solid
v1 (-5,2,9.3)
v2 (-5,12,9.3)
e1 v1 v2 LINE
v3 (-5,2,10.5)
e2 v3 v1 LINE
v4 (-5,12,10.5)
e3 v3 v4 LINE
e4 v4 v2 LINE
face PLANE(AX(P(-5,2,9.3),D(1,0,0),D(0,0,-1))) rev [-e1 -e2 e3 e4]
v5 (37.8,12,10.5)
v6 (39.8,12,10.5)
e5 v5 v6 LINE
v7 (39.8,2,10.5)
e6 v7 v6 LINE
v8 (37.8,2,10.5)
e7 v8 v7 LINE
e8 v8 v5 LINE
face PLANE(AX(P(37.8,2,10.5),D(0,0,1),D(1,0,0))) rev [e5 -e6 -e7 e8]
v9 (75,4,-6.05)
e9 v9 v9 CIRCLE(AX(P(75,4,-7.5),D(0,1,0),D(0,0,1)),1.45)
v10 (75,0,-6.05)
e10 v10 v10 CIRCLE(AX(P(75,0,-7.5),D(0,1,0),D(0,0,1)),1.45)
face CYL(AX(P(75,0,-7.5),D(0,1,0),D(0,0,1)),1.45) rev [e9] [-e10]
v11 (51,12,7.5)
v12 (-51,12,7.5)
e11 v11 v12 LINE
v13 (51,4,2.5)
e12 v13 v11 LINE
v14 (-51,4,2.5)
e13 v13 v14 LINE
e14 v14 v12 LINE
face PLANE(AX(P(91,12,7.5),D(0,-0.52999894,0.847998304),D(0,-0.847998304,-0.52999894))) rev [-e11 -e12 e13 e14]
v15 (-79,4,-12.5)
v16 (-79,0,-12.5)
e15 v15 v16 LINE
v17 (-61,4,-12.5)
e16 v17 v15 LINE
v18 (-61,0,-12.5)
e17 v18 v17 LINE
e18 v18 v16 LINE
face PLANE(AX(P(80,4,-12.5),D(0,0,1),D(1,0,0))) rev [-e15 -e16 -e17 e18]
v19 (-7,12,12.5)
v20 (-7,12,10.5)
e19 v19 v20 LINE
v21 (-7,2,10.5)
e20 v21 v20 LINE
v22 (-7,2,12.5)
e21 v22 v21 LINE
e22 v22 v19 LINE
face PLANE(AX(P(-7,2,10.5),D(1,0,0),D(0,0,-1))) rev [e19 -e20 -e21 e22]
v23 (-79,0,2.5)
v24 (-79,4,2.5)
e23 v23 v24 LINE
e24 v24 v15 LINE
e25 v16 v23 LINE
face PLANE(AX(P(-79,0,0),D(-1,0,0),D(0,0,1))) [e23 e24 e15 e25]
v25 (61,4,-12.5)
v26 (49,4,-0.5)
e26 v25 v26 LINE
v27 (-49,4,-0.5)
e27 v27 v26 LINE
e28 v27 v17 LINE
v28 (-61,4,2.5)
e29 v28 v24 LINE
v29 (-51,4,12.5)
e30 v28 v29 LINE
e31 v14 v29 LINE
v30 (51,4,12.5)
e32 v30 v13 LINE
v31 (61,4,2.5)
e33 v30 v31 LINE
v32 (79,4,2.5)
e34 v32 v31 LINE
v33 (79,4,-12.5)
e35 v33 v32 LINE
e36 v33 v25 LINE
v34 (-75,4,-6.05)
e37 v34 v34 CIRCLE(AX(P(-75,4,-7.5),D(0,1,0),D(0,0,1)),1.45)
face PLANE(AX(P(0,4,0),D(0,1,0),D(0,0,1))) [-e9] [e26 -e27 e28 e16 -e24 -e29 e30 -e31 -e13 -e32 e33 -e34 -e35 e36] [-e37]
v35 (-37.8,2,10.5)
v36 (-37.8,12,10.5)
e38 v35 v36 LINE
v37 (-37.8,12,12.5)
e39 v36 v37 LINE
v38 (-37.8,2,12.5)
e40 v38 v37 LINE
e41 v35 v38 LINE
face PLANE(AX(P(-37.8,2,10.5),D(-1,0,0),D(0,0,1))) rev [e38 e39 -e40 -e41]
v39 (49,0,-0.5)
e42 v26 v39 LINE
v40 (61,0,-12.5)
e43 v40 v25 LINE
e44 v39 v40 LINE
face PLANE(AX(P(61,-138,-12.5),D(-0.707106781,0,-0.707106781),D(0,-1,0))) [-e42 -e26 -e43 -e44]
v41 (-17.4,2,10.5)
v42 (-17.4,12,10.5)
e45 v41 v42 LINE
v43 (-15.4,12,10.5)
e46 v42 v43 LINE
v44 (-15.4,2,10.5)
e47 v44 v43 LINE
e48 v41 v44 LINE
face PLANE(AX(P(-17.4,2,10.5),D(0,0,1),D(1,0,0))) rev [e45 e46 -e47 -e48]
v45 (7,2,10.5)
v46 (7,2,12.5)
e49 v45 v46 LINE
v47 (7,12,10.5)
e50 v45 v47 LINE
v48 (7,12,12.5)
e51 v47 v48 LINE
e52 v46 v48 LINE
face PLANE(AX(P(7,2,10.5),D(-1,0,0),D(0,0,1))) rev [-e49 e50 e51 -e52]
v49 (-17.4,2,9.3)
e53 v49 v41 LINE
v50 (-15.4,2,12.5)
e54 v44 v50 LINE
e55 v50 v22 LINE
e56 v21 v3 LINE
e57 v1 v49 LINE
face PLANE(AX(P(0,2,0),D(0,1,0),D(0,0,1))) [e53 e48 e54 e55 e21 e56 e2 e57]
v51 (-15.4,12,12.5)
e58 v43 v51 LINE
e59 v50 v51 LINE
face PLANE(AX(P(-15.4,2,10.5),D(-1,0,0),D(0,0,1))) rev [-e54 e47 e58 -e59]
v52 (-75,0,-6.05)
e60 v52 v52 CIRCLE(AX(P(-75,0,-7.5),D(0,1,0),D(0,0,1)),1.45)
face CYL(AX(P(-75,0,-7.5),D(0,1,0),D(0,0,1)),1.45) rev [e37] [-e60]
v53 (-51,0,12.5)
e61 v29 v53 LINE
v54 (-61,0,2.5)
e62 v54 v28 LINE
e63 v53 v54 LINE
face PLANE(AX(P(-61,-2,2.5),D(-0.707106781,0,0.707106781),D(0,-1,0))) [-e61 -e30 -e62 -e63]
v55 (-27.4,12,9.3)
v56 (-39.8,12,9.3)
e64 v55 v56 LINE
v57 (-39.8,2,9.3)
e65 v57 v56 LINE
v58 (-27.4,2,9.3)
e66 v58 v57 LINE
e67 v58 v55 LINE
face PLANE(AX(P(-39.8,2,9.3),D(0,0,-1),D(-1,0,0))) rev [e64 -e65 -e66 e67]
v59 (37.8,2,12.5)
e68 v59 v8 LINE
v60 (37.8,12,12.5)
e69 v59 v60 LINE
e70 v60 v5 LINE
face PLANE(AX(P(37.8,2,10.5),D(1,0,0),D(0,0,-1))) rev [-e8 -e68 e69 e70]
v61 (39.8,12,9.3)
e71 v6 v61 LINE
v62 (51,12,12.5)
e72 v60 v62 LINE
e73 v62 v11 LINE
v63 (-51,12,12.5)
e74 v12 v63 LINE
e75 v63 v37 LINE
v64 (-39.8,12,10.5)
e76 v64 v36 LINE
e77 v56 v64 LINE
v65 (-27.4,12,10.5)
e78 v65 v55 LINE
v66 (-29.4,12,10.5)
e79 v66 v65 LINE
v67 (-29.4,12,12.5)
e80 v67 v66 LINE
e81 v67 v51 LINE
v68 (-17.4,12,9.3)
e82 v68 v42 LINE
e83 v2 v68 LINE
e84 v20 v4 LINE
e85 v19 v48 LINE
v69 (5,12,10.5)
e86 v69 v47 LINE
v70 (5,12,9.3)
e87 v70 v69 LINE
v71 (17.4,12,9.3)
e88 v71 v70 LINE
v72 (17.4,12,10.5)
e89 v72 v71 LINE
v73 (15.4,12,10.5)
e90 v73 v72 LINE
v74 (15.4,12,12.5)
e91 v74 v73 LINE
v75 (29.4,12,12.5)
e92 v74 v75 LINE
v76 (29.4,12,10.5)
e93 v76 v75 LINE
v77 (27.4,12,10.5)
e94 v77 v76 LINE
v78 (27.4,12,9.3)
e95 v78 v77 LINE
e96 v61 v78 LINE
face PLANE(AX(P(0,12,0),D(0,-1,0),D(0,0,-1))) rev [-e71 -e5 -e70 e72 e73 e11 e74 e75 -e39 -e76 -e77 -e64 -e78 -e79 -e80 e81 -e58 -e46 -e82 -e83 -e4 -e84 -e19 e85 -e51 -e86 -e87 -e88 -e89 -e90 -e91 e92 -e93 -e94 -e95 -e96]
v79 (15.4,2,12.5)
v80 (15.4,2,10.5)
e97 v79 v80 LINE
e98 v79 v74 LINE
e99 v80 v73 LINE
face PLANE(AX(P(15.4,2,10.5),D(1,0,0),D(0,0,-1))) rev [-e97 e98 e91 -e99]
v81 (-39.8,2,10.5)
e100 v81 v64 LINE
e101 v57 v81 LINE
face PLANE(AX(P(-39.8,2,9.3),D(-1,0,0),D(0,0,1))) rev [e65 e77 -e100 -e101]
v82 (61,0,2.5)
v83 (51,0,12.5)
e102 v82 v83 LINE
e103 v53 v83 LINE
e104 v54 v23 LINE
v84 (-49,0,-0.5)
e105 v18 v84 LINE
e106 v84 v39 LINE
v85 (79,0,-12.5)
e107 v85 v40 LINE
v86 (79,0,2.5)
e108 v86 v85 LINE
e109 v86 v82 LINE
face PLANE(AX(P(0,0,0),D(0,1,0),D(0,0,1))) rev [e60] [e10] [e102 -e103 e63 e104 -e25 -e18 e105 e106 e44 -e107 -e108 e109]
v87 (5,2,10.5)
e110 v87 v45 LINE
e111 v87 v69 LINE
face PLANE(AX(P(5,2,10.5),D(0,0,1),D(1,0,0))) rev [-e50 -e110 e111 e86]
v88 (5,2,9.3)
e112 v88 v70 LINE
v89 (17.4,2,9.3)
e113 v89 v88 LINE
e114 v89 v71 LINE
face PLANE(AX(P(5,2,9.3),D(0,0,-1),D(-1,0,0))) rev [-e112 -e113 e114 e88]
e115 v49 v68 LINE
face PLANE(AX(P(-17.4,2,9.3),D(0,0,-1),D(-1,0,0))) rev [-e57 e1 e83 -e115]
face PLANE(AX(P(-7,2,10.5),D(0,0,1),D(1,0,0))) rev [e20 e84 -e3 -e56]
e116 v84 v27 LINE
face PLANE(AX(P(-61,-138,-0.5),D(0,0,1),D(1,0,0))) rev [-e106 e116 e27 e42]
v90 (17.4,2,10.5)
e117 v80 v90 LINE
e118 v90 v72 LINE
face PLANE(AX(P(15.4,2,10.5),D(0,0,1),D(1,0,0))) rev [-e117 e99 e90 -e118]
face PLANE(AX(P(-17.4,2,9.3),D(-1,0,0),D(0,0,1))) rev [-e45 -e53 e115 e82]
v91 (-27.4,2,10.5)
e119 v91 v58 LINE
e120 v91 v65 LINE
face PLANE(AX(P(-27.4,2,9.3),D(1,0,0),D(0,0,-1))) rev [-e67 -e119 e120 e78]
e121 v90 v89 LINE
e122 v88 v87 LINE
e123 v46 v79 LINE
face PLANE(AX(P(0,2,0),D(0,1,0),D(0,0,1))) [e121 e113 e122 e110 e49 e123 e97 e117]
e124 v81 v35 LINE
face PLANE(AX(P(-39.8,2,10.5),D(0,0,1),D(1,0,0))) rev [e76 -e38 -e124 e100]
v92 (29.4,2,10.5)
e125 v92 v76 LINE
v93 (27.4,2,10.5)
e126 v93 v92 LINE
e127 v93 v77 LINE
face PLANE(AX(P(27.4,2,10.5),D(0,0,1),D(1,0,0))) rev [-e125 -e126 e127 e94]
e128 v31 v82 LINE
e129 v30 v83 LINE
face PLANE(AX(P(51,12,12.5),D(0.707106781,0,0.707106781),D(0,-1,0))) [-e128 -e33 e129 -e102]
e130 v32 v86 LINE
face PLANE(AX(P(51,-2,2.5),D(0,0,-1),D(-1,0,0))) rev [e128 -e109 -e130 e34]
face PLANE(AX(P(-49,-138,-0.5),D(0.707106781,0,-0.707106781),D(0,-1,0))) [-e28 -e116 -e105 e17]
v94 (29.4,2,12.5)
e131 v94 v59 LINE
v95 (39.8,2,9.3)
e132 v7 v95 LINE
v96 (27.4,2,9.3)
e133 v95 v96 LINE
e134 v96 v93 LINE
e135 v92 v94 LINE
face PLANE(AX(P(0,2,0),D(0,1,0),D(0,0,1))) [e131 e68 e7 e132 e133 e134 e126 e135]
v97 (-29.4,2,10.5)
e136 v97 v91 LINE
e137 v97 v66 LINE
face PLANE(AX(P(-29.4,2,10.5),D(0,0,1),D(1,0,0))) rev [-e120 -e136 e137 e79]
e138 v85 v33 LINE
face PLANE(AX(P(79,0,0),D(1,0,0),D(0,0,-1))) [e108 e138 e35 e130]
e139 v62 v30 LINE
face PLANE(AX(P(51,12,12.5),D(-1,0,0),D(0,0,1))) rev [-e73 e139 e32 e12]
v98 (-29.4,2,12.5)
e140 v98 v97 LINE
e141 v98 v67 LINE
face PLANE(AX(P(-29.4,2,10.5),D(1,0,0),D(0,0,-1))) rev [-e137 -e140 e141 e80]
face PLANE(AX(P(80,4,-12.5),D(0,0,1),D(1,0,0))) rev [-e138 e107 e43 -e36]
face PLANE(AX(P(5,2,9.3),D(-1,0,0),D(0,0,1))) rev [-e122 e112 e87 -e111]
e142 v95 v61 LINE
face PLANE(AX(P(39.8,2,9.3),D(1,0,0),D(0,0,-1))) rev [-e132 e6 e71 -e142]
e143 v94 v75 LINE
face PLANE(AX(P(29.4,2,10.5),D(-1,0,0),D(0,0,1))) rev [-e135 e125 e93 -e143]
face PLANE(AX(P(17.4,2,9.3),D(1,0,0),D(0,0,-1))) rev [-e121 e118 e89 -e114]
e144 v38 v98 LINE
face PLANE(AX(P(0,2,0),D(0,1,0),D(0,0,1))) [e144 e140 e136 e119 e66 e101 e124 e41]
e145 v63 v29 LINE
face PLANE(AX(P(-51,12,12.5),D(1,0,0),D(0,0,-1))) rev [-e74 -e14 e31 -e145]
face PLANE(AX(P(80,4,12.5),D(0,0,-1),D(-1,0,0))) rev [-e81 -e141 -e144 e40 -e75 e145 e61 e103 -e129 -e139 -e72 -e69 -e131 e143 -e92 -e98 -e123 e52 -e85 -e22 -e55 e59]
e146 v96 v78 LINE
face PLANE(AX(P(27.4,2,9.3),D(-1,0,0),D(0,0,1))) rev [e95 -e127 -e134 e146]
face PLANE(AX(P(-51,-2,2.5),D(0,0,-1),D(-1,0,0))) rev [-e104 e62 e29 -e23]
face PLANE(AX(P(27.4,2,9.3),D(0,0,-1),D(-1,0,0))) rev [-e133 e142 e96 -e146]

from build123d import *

# Parameters (mm, degrees)
SKETCH_1_W          = 160
SKETCH_1_H          = 25
EXTRUDE_1_DEPTH     = 4
SKETCH_3_R          = 1.45
CUT_EXTRUDE_1_DEPTH = 4
SKETCH_5_W          = 102
SKETCH_5_H          = 10
EXTRUDE_2_DEPTH     = 8
SKETCH_6_W          = 29
SKETCH_6_H          = 10
CUT_EXTRUDE_2_DEPTH = 6
CHAMFER_1_SIZE      = 10
CUT_EXTRUDE_3_DEPTH = 10
CUT_EXTRUDE_4_DEPTH = 142
SKETCH_10_W         = 122
SKETCH_10_H         = 12
CUT_EXTRUDE_5_DEPTH = 142
CHAMFER_2_SIZE      = 12
SKETCH_11_W         = 15
SKETCH_11_H         = 4
CUT_EXTRUDE_6_DEPTH = 1
SKETCH_12_W         = 15
SKETCH_12_H         = 4
CUT_EXTRUDE_7_DEPTH = 1


with BuildPart() as part:
    # 草图1 → 凸台-拉伸1 (new body)
    with BuildSketch(Plane(origin=(0, 0, 0), x_dir=(1, 0, 0), z_dir=(0, 1, 0))):
        Rectangle(SKETCH_1_W, SKETCH_1_H)
    extrude(amount=EXTRUDE_1_DEPTH)

    # 草图3 → 切除-拉伸1 (cut)
    with BuildSketch(Plane(origin=(0, 4, 0), x_dir=(1, 0, 0), z_dir=(0, 1, 0))):
        with Locations(Location((-75, 7.5, 0), (0, 0, 270))):
            Circle(SKETCH_3_R)
        with Locations(Location((75, 7.5, 0), (0, 0, 270))):
            Circle(SKETCH_3_R)
    extrude(amount=-CUT_EXTRUDE_1_DEPTH, mode=Mode.SUBTRACT)

    # 草图5 → 凸台-拉伸2 (add)
    with BuildSketch(Plane(origin=(0, 4, 0), x_dir=(1, 0, 0), z_dir=(0, 1, 0))):
        with Locations((0, -7.5)):
            Rectangle(SKETCH_5_W, SKETCH_5_H)
    extrude(amount=EXTRUDE_2_DEPTH)

    # 草图6 → 切除-拉伸2 (cut)
    with BuildSketch(Plane(origin=(0, 4, 0), x_dir=(1, 0, 0), z_dir=(0, 1, 0))):
        with Locations((-65.5, -7.5)):
            Rectangle(SKETCH_6_W, SKETCH_6_H)
        with Locations((65.5, -7.5)):
            Rectangle(SKETCH_6_W, SKETCH_6_H)
    extrude(amount=-CUT_EXTRUDE_2_DEPTH, mode=Mode.SUBTRACT)

    # 倒角1
    chamfer_1_edges = [part.edges().sort_by_distance(p)[0] for p in [
        (51, 2, 2.5),
        (-51, 2, 2.5),
    ]]
    chamfer(chamfer_1_edges, length=CHAMFER_1_SIZE - 0.0001)  # a hair under: the kernel refuses the full size

    # 草图7 → 切除-拉伸3 (cut)
    with BuildSketch(Plane(origin=(0, 12, 0), x_dir=(1, 0, 0), z_dir=(0, 1, 0))):
        Polygon((-39.8, -9.3), (-27.4, -9.3), (-27.4, -10.5), (-29.4, -10.5), (-29.4, -12.5), (-37.8, -12.5), (-37.8, -10.5), (-39.8, -10.5), align=None)
        Polygon((-17.4, -9.3), (-5, -9.3), (-5, -10.5), (-7, -10.5), (-7, -12.5), (-15.4, -12.5), (-15.4, -10.5), (-17.4, -10.5), align=None)
        Polygon((5, -9.3), (17.4, -9.3), (17.4, -10.5), (15.4, -10.5), (15.4, -12.5), (7, -12.5), (7, -10.5), (5, -10.5), align=None)
        Polygon((27.4, -9.3), (39.8, -9.3), (39.8, -10.5), (37.8, -10.5), (37.8, -12.5), (29.4, -12.5), (29.4, -10.5), (27.4, -10.5), align=None)
    extrude(amount=-CUT_EXTRUDE_3_DEPTH, mode=Mode.SUBTRACT)

    # 草图9 → 切除-拉伸4 (cut)
    with BuildSketch(Plane.ZY.offset(51)):
        Polygon((7.5, 12), (2.5, 4), (2.5, 12), align=None)
    extrude(amount=-CUT_EXTRUDE_4_DEPTH, mode=Mode.SUBTRACT)

    # 草图10 → 切除-拉伸5 (cut)
    with BuildSketch(Plane(origin=(0, 4, 0), x_dir=(1, 0, 0), z_dir=(0, 1, 0))):
        with Locations((0, 6.5)):
            Rectangle(SKETCH_10_W, SKETCH_10_H)
    extrude(amount=-CUT_EXTRUDE_5_DEPTH, mode=Mode.SUBTRACT)

    # 倒角2
    chamfer_2_edges = [part.edges().sort_by_distance(p)[0] for p in [
        (-61, 2, -0.5),
        (61, 2, -0.5),
    ]]
    chamfer(chamfer_2_edges, length=CHAMFER_2_SIZE - 0.0001)  # a hair under: the kernel refuses the full size

    # 草图11 → 切除-拉伸6 (cut)
    with BuildSketch(Plane.ZY.offset(80)):
        with Locations((-5, 2)):
            Rectangle(SKETCH_11_W, SKETCH_11_H)
    extrude(amount=-CUT_EXTRUDE_6_DEPTH, mode=Mode.SUBTRACT)

    # 草图12 → 切除-拉伸7 (cut)
    with BuildSketch(Plane(origin=(80, 0, 0), x_dir=(0, 0, -1), z_dir=(1, 0, 0))):
        with Locations((5, 2)):
            Rectangle(SKETCH_12_W, SKETCH_12_H)
    extrude(amount=-CUT_EXTRUDE_7_DEPTH, mode=Mode.SUBTRACT)


solid = part.part
